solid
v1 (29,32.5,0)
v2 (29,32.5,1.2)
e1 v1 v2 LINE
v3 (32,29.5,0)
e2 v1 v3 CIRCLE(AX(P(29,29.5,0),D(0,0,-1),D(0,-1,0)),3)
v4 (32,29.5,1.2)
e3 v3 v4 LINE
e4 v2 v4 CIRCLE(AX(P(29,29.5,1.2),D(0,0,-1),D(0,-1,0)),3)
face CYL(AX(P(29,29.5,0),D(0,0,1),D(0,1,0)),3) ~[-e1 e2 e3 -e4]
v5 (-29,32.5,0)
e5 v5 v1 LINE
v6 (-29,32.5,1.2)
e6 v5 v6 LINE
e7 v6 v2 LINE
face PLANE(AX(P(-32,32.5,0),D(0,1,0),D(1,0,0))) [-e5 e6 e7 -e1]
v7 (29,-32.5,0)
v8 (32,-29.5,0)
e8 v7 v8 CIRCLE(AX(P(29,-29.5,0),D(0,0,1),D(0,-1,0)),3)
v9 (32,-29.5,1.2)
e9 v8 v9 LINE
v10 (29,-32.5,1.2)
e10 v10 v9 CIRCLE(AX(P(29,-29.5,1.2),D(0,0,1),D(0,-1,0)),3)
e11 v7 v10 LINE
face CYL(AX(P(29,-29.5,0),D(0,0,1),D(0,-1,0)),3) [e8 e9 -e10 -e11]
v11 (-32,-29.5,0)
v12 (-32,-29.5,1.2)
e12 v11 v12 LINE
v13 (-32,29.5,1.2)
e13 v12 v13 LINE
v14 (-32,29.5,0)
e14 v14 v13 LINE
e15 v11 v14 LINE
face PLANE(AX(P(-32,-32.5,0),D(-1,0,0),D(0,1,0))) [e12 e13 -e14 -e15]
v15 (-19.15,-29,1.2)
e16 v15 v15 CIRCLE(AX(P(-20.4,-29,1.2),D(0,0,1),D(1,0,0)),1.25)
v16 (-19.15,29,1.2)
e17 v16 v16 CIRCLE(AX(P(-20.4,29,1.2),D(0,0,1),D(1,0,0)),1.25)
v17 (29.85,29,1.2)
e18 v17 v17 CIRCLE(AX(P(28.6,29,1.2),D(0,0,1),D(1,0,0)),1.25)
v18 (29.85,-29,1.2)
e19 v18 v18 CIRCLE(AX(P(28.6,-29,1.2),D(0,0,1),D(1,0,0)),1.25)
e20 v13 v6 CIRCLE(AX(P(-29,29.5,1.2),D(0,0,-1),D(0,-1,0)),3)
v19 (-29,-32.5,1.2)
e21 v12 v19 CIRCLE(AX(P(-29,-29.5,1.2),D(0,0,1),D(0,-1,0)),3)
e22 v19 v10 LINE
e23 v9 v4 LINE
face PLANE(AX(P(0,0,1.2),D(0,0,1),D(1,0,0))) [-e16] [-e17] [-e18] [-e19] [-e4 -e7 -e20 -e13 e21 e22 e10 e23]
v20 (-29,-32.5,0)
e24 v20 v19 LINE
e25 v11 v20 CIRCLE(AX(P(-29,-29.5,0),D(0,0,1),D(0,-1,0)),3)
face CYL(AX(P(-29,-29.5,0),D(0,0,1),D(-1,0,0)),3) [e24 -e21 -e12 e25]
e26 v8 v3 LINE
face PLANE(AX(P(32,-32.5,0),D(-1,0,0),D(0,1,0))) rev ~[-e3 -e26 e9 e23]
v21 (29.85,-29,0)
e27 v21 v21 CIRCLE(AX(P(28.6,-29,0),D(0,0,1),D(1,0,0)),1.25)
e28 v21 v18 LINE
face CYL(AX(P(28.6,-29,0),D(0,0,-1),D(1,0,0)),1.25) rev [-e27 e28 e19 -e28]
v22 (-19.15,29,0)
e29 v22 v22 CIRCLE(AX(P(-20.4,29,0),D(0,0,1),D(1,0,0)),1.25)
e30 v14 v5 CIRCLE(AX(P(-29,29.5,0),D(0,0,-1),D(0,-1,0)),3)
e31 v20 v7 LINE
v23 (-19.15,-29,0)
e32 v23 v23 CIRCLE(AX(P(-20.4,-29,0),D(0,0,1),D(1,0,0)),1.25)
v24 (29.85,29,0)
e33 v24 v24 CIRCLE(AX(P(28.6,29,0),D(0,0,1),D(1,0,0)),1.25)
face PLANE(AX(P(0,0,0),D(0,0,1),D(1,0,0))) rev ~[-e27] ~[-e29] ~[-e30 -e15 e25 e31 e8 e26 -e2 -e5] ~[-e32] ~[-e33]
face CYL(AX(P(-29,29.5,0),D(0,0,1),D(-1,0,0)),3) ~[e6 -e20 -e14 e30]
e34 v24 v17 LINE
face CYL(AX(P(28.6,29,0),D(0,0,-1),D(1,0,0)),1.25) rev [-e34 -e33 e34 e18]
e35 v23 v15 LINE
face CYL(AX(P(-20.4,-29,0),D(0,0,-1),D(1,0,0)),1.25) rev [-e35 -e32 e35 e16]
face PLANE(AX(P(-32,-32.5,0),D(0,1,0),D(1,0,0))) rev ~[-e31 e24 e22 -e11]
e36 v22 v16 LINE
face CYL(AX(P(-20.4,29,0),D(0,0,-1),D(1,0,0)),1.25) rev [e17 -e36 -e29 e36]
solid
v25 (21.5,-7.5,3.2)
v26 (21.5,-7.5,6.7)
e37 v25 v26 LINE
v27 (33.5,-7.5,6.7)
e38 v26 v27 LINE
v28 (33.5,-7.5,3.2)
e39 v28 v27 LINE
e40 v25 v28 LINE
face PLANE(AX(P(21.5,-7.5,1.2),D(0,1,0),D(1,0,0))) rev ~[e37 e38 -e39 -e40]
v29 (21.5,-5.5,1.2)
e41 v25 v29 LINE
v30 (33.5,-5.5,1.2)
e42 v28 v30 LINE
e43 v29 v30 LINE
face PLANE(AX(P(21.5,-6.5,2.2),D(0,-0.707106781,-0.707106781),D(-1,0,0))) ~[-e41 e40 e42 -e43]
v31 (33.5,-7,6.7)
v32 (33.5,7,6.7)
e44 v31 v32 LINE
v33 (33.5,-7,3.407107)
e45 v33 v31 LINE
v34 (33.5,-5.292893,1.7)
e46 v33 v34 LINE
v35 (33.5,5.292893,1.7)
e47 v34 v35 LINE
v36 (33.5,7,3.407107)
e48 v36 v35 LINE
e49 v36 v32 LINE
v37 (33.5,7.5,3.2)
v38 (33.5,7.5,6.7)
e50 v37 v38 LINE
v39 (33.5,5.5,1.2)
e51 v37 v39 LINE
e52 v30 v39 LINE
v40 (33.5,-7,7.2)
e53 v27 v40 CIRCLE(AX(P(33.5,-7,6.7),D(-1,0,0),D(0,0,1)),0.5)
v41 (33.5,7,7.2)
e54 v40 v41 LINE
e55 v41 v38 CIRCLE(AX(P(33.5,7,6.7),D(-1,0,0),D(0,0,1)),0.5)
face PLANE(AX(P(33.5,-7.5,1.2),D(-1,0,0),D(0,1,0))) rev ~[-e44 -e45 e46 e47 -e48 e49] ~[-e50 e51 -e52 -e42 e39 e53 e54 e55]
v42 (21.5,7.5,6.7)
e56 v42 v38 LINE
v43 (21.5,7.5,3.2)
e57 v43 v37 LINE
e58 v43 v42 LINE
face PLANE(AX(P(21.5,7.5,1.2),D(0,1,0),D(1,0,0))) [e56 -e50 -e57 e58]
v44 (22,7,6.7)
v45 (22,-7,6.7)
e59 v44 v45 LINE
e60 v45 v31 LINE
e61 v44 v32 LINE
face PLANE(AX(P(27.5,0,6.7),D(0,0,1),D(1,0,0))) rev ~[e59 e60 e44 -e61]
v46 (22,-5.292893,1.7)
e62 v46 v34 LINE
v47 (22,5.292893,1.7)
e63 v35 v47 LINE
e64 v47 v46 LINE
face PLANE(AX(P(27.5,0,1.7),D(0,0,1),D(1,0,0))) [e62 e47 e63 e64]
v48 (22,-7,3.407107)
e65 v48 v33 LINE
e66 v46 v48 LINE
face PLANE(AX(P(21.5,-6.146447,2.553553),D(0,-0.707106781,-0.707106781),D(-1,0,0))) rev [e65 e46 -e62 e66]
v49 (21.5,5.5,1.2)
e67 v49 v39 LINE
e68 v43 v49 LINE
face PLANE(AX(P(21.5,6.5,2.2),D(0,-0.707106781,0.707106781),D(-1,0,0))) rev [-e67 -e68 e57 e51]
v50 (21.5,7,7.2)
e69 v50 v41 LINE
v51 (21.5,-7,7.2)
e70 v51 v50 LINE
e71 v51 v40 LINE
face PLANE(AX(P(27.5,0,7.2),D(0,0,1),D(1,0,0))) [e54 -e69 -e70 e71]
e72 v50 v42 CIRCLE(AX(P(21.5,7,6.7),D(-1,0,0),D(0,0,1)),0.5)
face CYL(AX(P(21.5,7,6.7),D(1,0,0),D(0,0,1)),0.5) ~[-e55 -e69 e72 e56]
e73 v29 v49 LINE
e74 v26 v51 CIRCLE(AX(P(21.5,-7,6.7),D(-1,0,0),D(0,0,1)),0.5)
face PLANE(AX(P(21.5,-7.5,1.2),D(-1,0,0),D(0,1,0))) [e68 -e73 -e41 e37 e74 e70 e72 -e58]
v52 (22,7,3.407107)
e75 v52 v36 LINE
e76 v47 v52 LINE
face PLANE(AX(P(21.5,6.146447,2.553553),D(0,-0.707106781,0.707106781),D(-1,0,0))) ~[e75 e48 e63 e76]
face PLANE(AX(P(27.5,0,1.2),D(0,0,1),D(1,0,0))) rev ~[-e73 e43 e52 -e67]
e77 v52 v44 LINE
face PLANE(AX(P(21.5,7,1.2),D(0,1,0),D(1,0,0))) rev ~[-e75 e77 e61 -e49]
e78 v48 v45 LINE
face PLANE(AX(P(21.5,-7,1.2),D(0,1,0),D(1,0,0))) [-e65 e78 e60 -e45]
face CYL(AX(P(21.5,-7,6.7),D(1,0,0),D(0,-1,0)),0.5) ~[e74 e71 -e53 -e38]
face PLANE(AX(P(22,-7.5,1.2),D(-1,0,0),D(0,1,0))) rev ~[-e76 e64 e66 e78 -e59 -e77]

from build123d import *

# Parameters (mm, degrees)
F0_W     = 64
F0_H     = 65
F0_R     = 1.25
F1_DEPTH = 1.2
F2_R     = 3
F3_W     = 12
F3_H     = 15
F4_DEPTH = 6
F5_SIZE  = 2
F6_R     = 0.5
F7_T     = 0.5


# Not quite as in the source:
# - a shell that OpenCascade refuses in one call is made with other operations: the cavity is built on its own and cut out


with BuildPart() as f1:
    # F0 (on Top) → F1 (new body)
    with BuildSketch(Plane.XY):
        Rectangle(F0_W, F0_H)
        with Locations((-20.4, -29)):
            Circle(F0_R, mode=Mode.SUBTRACT)
        with Locations((28.6, -29)):
            Circle(F0_R, mode=Mode.SUBTRACT)
        with Locations((-20.4, 29)):
            Circle(F0_R, mode=Mode.SUBTRACT)
        with Locations((28.6, 29)):
            Circle(F0_R, mode=Mode.SUBTRACT)
    extrude(amount=F1_DEPTH)

    # F2
    f2_edges = [f1.edges().sort_by_distance(p)[0] for p in [
        (-32, 32.5, 0.6),
        (32, 32.5, 0.6),
        (32, -32.5, 0.6),
        (-32, -32.5, 0.6),
    ]]
    fillet(f2_edges, radius=F2_R)


with BuildPart() as f4:
    # F3 (on face) → F4 (new body)
    with BuildSketch(Plane.XY.offset(1.2)):
        with Locations((27.5, 0)):
            Rectangle(F3_W, F3_H)
    extrude(amount=F4_DEPTH)

    # F5
    f5_edges = [f4.edges().sort_by_distance(p)[0] for p in [
        (27.5, -7.5, 1.2),
        (27.5, 7.5, 1.2),
    ]]
    chamfer(f5_edges, length=F5_SIZE)

    # F6
    f6_edges = [f4.edges().sort_by_distance(p)[0] for p in [
        (27.5, -7.5, 7.2),
        (27.5, 7.5, 7.2),
    ]]
    fillet(f6_edges, radius=F6_R)

    # F7: shell of thickness 0.5, made by hand


with BuildPart() as f7_core1:
    # F7_t2: copy of F4
    add(f4.part)

    # the walls: a layer under each face that stays
    f7_faces = [f7_core1.faces().sort_by_distance(p)[0] for p in [
        (27.5, -7.5, 4.95),
        (27.5, -6.5, 2.2),
        (27.5, 0, 7.2),
        (27.5, 0, 1.2),
        (27.5, 6.5, 2.2),
        (27.5, 7.5, 4.95),
        (21.5, 0, 4.2),
    ]]
    thicken(f7_faces, amount=-F7_T, mode=Mode.SUBTRACT)


with BuildPart() as f4_1:
    add(f4.part)

    # what is left inside the walls is the cavity
    f7_cavity = [f7_core1.part.solids().sort_by_distance(p)[0] for p in [
        (27.75, -2.333333, 6.695),
    ]]
    add(f7_cavity, mode=Mode.SUBTRACT)


solid = Compound([f1.part, f4_1.part])
